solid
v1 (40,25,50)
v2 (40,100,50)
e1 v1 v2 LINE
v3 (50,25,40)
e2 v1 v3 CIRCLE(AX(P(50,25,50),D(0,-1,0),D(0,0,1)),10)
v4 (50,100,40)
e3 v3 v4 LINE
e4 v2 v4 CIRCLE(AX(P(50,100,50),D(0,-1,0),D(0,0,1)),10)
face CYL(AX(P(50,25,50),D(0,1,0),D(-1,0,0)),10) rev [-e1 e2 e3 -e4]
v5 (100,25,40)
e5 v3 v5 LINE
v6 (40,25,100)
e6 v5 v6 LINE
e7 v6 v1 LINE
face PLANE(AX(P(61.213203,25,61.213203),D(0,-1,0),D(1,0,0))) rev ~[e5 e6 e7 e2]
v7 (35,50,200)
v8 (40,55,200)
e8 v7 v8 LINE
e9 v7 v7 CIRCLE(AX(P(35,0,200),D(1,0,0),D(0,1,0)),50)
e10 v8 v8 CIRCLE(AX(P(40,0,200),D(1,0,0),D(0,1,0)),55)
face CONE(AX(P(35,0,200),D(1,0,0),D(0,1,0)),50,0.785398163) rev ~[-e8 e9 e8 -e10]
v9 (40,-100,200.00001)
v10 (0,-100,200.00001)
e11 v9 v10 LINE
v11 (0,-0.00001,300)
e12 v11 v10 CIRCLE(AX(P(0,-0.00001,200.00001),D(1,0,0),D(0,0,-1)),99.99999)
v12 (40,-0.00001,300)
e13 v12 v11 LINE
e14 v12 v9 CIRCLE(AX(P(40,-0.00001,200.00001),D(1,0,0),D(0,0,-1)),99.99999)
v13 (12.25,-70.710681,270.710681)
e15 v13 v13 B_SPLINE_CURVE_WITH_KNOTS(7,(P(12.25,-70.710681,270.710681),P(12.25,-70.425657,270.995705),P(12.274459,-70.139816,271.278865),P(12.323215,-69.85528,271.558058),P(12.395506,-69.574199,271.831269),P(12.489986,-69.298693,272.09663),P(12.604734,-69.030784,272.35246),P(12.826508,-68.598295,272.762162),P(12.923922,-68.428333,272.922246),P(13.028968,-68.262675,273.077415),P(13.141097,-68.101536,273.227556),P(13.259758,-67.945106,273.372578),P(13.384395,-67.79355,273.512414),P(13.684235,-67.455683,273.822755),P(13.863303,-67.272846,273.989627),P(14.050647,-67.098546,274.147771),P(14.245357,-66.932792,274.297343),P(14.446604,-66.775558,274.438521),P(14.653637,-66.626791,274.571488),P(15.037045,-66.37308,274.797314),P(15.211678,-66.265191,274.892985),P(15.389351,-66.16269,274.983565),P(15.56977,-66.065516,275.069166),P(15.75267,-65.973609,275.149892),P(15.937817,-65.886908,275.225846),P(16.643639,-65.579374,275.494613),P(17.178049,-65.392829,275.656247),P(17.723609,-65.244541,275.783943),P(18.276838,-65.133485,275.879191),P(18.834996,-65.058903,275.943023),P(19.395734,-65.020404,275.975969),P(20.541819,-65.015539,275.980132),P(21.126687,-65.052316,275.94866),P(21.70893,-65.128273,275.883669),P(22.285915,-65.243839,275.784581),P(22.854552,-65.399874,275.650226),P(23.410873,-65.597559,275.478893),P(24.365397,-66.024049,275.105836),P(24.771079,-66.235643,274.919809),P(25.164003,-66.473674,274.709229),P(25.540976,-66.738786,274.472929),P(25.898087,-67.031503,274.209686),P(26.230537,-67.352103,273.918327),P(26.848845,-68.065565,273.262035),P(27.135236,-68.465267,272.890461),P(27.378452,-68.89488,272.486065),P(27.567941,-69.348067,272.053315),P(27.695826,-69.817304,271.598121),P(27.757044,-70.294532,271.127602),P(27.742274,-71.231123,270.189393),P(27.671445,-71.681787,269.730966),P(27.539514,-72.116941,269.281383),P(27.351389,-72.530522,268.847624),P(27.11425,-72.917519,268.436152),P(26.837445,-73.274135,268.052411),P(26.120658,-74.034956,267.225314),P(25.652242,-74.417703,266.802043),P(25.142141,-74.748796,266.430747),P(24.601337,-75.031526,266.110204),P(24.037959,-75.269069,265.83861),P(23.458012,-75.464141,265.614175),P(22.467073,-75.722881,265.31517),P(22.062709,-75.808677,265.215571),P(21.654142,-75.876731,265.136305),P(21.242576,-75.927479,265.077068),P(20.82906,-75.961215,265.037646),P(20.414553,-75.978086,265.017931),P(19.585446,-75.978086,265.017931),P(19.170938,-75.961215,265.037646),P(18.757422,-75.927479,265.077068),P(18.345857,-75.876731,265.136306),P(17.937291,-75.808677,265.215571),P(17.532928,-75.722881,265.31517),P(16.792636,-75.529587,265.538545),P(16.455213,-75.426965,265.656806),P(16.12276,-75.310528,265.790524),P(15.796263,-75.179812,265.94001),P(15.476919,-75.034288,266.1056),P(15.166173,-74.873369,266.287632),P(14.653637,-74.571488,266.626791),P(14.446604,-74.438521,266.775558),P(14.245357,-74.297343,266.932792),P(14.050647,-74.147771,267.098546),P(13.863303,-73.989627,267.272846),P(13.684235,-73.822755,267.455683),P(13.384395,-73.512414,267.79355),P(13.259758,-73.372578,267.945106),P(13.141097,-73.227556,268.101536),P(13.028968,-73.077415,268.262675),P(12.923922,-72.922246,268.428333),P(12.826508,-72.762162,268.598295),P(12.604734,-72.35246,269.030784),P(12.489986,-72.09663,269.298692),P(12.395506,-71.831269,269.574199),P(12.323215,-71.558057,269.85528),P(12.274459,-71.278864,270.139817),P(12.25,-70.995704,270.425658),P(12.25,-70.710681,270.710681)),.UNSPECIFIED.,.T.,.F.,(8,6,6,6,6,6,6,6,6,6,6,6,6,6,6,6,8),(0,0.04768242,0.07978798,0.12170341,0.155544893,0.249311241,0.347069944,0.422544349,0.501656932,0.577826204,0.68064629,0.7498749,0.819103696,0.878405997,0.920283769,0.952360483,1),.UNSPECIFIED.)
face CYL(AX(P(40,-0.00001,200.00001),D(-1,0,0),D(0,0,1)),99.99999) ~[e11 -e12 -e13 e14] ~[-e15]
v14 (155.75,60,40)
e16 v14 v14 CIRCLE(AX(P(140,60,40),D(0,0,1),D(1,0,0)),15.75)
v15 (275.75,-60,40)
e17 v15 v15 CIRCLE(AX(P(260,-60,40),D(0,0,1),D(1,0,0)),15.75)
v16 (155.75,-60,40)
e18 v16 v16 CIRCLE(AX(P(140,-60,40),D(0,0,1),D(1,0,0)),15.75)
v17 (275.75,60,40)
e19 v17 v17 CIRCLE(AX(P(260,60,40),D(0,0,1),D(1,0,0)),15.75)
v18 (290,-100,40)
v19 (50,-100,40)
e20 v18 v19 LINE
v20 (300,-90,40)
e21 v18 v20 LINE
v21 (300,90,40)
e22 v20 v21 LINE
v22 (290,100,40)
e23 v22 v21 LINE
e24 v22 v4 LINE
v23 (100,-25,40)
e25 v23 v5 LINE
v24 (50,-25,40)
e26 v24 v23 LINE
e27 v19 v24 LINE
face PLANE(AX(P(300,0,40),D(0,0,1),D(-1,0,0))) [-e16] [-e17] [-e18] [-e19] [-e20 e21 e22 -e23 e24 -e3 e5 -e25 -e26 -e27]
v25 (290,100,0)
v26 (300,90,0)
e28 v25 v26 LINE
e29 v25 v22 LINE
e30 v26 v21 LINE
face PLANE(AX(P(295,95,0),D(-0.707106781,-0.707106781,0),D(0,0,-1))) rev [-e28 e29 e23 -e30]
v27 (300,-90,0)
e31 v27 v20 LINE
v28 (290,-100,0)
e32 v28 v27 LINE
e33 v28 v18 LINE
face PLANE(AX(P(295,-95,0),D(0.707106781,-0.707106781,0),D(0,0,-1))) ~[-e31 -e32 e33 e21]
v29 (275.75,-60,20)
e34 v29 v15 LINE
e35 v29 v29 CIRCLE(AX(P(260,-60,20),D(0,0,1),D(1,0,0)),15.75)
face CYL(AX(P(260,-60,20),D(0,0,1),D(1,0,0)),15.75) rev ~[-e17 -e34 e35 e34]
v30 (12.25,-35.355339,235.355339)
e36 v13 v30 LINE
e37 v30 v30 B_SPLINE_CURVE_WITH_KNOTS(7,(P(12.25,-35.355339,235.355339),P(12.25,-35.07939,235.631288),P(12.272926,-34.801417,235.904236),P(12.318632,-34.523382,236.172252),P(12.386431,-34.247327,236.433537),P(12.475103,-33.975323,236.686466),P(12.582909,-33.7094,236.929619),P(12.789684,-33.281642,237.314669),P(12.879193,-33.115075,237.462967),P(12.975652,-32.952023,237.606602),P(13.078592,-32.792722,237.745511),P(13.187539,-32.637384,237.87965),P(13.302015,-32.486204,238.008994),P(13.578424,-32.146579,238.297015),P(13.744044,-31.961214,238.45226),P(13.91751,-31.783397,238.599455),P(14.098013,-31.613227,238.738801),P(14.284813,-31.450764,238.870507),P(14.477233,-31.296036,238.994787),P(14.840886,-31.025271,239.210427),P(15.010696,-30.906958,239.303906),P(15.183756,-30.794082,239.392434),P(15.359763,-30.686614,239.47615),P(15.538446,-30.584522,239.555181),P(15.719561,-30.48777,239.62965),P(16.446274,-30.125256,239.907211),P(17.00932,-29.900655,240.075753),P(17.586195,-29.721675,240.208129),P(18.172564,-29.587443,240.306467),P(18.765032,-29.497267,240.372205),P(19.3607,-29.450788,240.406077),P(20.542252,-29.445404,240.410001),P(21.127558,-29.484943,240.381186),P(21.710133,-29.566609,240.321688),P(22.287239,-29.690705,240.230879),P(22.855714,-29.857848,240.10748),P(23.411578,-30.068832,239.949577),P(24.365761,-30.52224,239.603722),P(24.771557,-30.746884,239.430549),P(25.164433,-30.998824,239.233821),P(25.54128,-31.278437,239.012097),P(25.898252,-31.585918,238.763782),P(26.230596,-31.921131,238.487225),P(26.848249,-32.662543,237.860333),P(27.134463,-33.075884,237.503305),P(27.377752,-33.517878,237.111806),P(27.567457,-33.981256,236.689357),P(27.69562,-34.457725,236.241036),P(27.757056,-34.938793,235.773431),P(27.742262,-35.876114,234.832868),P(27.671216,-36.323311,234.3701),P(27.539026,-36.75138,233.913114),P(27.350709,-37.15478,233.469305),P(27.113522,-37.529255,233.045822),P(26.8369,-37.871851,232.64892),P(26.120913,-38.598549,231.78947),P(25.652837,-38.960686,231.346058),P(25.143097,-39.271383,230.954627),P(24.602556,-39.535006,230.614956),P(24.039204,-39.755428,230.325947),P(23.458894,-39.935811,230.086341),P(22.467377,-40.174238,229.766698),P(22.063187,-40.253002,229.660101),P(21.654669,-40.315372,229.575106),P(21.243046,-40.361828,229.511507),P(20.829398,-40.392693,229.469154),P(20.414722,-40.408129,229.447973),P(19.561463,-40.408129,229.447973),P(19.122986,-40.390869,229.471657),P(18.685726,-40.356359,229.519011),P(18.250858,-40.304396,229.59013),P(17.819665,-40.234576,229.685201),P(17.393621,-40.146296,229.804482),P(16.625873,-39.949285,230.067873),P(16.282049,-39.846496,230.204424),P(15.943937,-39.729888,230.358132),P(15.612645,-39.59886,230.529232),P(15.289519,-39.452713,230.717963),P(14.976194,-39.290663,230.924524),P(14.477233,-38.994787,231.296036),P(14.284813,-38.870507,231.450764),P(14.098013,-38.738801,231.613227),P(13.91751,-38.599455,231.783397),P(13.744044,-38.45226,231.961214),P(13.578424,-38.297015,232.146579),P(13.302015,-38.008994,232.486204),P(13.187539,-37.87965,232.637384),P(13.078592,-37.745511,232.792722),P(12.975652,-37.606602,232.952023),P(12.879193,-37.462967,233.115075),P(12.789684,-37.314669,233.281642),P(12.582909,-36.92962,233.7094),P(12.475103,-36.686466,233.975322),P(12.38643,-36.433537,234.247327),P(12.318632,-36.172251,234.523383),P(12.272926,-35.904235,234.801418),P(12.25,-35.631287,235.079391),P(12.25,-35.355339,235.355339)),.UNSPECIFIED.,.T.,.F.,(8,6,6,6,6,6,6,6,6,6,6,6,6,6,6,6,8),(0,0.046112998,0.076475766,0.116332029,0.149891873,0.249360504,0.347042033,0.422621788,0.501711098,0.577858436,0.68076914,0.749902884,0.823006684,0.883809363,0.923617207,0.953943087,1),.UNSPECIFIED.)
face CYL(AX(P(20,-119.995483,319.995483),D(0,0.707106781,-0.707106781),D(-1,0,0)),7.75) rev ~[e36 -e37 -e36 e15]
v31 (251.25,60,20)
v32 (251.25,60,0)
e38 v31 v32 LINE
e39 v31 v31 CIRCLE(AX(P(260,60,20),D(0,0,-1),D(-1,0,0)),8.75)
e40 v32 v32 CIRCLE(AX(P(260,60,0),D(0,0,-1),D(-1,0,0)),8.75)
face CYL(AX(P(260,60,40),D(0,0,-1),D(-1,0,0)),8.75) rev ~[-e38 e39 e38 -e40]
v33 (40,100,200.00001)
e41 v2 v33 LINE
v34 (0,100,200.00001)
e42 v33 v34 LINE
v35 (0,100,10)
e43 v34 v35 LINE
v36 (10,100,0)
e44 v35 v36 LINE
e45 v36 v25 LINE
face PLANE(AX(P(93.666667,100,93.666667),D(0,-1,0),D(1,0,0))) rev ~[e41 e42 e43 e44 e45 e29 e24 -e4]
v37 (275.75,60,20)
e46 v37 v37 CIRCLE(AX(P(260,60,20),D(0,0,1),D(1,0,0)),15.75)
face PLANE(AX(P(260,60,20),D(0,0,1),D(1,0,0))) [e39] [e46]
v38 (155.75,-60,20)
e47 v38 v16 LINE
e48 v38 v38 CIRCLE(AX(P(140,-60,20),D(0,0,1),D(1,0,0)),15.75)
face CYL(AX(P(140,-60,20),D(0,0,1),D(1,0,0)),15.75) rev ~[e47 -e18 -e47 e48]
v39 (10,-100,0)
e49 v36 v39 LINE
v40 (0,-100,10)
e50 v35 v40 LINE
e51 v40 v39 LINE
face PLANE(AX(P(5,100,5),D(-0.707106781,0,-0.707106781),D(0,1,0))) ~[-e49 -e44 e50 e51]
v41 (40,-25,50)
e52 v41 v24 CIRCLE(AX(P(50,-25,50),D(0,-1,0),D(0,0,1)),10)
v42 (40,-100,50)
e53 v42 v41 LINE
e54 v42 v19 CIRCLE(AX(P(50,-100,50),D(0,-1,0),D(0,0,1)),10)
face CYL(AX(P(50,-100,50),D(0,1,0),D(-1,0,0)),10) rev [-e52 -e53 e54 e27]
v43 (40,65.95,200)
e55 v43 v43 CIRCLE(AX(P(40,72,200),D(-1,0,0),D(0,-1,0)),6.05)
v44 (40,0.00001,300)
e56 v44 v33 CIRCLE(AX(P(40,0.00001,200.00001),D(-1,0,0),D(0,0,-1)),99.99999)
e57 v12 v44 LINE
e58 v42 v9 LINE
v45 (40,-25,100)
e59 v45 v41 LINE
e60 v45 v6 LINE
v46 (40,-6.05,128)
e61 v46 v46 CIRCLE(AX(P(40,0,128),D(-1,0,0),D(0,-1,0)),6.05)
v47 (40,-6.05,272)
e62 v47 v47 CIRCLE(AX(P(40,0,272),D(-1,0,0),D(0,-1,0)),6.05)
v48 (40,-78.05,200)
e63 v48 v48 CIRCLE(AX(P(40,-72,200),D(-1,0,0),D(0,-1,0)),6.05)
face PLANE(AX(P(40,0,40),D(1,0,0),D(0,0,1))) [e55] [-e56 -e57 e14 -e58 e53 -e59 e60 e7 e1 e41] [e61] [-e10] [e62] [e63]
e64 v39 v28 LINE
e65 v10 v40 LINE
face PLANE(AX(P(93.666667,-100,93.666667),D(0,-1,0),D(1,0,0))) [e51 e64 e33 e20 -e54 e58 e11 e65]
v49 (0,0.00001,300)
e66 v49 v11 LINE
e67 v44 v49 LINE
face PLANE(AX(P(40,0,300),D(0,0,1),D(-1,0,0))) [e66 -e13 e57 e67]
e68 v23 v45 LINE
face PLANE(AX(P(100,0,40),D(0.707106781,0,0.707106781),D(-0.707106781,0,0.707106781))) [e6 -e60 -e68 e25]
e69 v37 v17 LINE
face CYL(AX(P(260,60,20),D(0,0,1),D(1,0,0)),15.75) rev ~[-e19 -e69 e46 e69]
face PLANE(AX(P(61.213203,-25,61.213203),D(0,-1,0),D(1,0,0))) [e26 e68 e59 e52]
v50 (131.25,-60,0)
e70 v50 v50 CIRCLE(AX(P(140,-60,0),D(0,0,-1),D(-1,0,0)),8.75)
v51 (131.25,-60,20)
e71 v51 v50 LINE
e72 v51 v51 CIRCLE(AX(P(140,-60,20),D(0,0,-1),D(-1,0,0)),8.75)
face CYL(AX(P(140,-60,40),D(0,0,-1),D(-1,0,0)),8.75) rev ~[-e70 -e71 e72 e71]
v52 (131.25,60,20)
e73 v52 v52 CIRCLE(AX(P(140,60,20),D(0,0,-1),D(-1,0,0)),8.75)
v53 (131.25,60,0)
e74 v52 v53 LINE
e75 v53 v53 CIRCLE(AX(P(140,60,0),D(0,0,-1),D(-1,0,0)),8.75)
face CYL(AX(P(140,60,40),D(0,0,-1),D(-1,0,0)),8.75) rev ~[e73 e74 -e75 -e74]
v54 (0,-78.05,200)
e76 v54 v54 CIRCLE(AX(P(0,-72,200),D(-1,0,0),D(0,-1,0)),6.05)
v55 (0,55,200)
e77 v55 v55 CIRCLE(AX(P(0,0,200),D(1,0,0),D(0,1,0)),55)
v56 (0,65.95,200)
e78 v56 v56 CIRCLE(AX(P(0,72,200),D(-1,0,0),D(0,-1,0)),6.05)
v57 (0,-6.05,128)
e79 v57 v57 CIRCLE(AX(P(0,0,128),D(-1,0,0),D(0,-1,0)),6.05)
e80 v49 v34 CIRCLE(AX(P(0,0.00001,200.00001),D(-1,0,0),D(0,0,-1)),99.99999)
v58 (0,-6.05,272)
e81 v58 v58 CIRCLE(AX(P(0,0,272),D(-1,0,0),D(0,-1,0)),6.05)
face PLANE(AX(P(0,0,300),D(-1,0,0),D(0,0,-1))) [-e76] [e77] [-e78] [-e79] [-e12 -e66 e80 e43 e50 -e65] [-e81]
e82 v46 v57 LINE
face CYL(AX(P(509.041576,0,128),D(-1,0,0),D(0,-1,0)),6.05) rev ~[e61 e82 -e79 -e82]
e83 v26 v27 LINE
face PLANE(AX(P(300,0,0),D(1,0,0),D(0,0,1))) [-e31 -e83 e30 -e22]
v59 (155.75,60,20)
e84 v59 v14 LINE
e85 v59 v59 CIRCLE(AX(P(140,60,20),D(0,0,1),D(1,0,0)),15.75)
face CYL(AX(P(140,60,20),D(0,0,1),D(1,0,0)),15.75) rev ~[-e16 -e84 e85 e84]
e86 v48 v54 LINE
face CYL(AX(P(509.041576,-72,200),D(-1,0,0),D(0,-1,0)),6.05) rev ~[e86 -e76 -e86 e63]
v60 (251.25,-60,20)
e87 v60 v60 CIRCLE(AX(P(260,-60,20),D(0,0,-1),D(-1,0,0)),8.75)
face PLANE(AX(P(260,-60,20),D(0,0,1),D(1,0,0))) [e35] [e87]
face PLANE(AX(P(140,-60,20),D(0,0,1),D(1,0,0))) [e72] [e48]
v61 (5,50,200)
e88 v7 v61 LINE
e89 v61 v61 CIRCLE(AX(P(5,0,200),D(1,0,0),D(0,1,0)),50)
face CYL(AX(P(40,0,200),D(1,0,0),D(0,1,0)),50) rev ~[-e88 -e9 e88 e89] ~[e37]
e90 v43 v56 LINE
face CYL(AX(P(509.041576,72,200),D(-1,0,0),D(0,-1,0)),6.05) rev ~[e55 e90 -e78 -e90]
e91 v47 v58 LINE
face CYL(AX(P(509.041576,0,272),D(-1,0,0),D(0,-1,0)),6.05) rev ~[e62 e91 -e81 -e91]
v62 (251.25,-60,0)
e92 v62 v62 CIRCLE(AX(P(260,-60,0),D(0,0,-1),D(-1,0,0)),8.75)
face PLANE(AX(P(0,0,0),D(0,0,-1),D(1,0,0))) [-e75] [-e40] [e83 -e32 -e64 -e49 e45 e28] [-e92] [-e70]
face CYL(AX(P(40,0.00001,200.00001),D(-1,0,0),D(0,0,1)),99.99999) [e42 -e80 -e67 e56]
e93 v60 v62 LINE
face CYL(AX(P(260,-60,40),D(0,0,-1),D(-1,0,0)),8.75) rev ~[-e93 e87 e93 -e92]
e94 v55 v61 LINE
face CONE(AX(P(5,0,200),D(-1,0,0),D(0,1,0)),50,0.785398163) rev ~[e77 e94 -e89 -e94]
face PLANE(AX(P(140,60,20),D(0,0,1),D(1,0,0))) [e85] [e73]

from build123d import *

# Parameters (mm, degrees)
F1_DEPTH        = 100
F2_R            = 99.99999
F3_SIZE         = 10
F5_DEPTH        = 25
F6_R            = 50
F7_DEPTH        = 40.001
F10_D           = 12.1
F11_D           = 15.5
F11_DEPTH       = 70
F11_START       = 0.3007608
F11_TIP         = 4.6566697975
F13_D           = 17.5
F13_CBORE_D     = 31.5
F13_CBORE_DEPTH = 20
F14_SIZE        = 5
F15_R           = 10


# Not quite as in the source:
# - a fillet or chamfer is up to 0.001 mm smaller than in the source, because OpenCascade refuses the exact size


with BuildPart() as f1:
    # F0 (on Front) → F1 (new body, symmetric)
    with BuildSketch(Plane.XZ):
        Polygon((40, 300), (0, 300), (0, 0), (300, 0), (300, 40), (40, 40), align=None)
    extrude(amount=F1_DEPTH, both=True)

    # F2 (radius 100 in the source; OpenCascade refuses exactly that, so slightly less here)
    f2_edges = [f1.edges().sort_by_distance(p)[0] for p in [
        (20, -100, 300),
        (20, 100, 300),
    ]]
    fillet(f2_edges, radius=F2_R)

    # F3
    f3_edges = [f1.edges().sort_by_distance(p)[0] for p in [
        (300, -100, 20),
        (300, 100, 20),
        (0, 0, 0),
    ]]
    chamfer(f3_edges, length=F3_SIZE)

    # F4 (on Front) → F5 (join, symmetric)
    with BuildSketch(Plane.XZ):
        Polygon((40, 100), (40, 40), (100, 40), align=None)
    extrude(amount=F5_DEPTH, both=True)

    # F6 (on face) → F7 (cut, through all)
    with BuildSketch(Plane.YZ.offset(40)):
        with Locations((0, 200)):
            Circle(F6_R)
    extrude(amount=-F7_DEPTH, mode=Mode.SUBTRACT)

    # F10 (through all)
    with Locations(Plane.YZ.offset(40)):
        with Locations((0, 272), (72, 200), (0, 128), (-72, 200)):
            Hole(F10_D / 2)

    # F11
    # its depths count from where the whole tool has entered the part; down to there all is cleared
    with Locations(Plane(origin=(0, -170.7106781187, 170.7106781187), x_dir=(1, 0, 0), z_dir=(0, -0.7071067812, 0.7071067812)).offset(-F11_START)):
        with Locations((20, 141.4213562373)):
            Hole(F11_D / 2, depth=F11_DEPTH)
            with Locations((0, 0, -(F11_DEPTH + F11_TIP / 2))):  # 118° drill point
                Cone(0, F11_D / 2, F11_TIP, mode=Mode.SUBTRACT)

    # F13 (through all)
    with Locations(Plane.XY.offset(40)):
        with Locations((140, -60), (140, 60), (260, 60), (260, -60)):
            CounterBoreHole(F13_D / 2, F13_CBORE_D / 2, F13_CBORE_DEPTH)

    # F14
    f14_edges = [f1.edges().sort_by_distance(p)[0] for p in [
        (40, -50, 200),
        (0, -50, 200),
    ]]
    chamfer(f14_edges, length=F14_SIZE)

    # F15
    f15_edges = [f1.edges().sort_by_distance(p)[0] for p in [
        (40, -62.5, 40),
        (40, 62.5, 40),
    ]]
    fillet(f15_edges, radius=F15_R)


solid = f1.part
